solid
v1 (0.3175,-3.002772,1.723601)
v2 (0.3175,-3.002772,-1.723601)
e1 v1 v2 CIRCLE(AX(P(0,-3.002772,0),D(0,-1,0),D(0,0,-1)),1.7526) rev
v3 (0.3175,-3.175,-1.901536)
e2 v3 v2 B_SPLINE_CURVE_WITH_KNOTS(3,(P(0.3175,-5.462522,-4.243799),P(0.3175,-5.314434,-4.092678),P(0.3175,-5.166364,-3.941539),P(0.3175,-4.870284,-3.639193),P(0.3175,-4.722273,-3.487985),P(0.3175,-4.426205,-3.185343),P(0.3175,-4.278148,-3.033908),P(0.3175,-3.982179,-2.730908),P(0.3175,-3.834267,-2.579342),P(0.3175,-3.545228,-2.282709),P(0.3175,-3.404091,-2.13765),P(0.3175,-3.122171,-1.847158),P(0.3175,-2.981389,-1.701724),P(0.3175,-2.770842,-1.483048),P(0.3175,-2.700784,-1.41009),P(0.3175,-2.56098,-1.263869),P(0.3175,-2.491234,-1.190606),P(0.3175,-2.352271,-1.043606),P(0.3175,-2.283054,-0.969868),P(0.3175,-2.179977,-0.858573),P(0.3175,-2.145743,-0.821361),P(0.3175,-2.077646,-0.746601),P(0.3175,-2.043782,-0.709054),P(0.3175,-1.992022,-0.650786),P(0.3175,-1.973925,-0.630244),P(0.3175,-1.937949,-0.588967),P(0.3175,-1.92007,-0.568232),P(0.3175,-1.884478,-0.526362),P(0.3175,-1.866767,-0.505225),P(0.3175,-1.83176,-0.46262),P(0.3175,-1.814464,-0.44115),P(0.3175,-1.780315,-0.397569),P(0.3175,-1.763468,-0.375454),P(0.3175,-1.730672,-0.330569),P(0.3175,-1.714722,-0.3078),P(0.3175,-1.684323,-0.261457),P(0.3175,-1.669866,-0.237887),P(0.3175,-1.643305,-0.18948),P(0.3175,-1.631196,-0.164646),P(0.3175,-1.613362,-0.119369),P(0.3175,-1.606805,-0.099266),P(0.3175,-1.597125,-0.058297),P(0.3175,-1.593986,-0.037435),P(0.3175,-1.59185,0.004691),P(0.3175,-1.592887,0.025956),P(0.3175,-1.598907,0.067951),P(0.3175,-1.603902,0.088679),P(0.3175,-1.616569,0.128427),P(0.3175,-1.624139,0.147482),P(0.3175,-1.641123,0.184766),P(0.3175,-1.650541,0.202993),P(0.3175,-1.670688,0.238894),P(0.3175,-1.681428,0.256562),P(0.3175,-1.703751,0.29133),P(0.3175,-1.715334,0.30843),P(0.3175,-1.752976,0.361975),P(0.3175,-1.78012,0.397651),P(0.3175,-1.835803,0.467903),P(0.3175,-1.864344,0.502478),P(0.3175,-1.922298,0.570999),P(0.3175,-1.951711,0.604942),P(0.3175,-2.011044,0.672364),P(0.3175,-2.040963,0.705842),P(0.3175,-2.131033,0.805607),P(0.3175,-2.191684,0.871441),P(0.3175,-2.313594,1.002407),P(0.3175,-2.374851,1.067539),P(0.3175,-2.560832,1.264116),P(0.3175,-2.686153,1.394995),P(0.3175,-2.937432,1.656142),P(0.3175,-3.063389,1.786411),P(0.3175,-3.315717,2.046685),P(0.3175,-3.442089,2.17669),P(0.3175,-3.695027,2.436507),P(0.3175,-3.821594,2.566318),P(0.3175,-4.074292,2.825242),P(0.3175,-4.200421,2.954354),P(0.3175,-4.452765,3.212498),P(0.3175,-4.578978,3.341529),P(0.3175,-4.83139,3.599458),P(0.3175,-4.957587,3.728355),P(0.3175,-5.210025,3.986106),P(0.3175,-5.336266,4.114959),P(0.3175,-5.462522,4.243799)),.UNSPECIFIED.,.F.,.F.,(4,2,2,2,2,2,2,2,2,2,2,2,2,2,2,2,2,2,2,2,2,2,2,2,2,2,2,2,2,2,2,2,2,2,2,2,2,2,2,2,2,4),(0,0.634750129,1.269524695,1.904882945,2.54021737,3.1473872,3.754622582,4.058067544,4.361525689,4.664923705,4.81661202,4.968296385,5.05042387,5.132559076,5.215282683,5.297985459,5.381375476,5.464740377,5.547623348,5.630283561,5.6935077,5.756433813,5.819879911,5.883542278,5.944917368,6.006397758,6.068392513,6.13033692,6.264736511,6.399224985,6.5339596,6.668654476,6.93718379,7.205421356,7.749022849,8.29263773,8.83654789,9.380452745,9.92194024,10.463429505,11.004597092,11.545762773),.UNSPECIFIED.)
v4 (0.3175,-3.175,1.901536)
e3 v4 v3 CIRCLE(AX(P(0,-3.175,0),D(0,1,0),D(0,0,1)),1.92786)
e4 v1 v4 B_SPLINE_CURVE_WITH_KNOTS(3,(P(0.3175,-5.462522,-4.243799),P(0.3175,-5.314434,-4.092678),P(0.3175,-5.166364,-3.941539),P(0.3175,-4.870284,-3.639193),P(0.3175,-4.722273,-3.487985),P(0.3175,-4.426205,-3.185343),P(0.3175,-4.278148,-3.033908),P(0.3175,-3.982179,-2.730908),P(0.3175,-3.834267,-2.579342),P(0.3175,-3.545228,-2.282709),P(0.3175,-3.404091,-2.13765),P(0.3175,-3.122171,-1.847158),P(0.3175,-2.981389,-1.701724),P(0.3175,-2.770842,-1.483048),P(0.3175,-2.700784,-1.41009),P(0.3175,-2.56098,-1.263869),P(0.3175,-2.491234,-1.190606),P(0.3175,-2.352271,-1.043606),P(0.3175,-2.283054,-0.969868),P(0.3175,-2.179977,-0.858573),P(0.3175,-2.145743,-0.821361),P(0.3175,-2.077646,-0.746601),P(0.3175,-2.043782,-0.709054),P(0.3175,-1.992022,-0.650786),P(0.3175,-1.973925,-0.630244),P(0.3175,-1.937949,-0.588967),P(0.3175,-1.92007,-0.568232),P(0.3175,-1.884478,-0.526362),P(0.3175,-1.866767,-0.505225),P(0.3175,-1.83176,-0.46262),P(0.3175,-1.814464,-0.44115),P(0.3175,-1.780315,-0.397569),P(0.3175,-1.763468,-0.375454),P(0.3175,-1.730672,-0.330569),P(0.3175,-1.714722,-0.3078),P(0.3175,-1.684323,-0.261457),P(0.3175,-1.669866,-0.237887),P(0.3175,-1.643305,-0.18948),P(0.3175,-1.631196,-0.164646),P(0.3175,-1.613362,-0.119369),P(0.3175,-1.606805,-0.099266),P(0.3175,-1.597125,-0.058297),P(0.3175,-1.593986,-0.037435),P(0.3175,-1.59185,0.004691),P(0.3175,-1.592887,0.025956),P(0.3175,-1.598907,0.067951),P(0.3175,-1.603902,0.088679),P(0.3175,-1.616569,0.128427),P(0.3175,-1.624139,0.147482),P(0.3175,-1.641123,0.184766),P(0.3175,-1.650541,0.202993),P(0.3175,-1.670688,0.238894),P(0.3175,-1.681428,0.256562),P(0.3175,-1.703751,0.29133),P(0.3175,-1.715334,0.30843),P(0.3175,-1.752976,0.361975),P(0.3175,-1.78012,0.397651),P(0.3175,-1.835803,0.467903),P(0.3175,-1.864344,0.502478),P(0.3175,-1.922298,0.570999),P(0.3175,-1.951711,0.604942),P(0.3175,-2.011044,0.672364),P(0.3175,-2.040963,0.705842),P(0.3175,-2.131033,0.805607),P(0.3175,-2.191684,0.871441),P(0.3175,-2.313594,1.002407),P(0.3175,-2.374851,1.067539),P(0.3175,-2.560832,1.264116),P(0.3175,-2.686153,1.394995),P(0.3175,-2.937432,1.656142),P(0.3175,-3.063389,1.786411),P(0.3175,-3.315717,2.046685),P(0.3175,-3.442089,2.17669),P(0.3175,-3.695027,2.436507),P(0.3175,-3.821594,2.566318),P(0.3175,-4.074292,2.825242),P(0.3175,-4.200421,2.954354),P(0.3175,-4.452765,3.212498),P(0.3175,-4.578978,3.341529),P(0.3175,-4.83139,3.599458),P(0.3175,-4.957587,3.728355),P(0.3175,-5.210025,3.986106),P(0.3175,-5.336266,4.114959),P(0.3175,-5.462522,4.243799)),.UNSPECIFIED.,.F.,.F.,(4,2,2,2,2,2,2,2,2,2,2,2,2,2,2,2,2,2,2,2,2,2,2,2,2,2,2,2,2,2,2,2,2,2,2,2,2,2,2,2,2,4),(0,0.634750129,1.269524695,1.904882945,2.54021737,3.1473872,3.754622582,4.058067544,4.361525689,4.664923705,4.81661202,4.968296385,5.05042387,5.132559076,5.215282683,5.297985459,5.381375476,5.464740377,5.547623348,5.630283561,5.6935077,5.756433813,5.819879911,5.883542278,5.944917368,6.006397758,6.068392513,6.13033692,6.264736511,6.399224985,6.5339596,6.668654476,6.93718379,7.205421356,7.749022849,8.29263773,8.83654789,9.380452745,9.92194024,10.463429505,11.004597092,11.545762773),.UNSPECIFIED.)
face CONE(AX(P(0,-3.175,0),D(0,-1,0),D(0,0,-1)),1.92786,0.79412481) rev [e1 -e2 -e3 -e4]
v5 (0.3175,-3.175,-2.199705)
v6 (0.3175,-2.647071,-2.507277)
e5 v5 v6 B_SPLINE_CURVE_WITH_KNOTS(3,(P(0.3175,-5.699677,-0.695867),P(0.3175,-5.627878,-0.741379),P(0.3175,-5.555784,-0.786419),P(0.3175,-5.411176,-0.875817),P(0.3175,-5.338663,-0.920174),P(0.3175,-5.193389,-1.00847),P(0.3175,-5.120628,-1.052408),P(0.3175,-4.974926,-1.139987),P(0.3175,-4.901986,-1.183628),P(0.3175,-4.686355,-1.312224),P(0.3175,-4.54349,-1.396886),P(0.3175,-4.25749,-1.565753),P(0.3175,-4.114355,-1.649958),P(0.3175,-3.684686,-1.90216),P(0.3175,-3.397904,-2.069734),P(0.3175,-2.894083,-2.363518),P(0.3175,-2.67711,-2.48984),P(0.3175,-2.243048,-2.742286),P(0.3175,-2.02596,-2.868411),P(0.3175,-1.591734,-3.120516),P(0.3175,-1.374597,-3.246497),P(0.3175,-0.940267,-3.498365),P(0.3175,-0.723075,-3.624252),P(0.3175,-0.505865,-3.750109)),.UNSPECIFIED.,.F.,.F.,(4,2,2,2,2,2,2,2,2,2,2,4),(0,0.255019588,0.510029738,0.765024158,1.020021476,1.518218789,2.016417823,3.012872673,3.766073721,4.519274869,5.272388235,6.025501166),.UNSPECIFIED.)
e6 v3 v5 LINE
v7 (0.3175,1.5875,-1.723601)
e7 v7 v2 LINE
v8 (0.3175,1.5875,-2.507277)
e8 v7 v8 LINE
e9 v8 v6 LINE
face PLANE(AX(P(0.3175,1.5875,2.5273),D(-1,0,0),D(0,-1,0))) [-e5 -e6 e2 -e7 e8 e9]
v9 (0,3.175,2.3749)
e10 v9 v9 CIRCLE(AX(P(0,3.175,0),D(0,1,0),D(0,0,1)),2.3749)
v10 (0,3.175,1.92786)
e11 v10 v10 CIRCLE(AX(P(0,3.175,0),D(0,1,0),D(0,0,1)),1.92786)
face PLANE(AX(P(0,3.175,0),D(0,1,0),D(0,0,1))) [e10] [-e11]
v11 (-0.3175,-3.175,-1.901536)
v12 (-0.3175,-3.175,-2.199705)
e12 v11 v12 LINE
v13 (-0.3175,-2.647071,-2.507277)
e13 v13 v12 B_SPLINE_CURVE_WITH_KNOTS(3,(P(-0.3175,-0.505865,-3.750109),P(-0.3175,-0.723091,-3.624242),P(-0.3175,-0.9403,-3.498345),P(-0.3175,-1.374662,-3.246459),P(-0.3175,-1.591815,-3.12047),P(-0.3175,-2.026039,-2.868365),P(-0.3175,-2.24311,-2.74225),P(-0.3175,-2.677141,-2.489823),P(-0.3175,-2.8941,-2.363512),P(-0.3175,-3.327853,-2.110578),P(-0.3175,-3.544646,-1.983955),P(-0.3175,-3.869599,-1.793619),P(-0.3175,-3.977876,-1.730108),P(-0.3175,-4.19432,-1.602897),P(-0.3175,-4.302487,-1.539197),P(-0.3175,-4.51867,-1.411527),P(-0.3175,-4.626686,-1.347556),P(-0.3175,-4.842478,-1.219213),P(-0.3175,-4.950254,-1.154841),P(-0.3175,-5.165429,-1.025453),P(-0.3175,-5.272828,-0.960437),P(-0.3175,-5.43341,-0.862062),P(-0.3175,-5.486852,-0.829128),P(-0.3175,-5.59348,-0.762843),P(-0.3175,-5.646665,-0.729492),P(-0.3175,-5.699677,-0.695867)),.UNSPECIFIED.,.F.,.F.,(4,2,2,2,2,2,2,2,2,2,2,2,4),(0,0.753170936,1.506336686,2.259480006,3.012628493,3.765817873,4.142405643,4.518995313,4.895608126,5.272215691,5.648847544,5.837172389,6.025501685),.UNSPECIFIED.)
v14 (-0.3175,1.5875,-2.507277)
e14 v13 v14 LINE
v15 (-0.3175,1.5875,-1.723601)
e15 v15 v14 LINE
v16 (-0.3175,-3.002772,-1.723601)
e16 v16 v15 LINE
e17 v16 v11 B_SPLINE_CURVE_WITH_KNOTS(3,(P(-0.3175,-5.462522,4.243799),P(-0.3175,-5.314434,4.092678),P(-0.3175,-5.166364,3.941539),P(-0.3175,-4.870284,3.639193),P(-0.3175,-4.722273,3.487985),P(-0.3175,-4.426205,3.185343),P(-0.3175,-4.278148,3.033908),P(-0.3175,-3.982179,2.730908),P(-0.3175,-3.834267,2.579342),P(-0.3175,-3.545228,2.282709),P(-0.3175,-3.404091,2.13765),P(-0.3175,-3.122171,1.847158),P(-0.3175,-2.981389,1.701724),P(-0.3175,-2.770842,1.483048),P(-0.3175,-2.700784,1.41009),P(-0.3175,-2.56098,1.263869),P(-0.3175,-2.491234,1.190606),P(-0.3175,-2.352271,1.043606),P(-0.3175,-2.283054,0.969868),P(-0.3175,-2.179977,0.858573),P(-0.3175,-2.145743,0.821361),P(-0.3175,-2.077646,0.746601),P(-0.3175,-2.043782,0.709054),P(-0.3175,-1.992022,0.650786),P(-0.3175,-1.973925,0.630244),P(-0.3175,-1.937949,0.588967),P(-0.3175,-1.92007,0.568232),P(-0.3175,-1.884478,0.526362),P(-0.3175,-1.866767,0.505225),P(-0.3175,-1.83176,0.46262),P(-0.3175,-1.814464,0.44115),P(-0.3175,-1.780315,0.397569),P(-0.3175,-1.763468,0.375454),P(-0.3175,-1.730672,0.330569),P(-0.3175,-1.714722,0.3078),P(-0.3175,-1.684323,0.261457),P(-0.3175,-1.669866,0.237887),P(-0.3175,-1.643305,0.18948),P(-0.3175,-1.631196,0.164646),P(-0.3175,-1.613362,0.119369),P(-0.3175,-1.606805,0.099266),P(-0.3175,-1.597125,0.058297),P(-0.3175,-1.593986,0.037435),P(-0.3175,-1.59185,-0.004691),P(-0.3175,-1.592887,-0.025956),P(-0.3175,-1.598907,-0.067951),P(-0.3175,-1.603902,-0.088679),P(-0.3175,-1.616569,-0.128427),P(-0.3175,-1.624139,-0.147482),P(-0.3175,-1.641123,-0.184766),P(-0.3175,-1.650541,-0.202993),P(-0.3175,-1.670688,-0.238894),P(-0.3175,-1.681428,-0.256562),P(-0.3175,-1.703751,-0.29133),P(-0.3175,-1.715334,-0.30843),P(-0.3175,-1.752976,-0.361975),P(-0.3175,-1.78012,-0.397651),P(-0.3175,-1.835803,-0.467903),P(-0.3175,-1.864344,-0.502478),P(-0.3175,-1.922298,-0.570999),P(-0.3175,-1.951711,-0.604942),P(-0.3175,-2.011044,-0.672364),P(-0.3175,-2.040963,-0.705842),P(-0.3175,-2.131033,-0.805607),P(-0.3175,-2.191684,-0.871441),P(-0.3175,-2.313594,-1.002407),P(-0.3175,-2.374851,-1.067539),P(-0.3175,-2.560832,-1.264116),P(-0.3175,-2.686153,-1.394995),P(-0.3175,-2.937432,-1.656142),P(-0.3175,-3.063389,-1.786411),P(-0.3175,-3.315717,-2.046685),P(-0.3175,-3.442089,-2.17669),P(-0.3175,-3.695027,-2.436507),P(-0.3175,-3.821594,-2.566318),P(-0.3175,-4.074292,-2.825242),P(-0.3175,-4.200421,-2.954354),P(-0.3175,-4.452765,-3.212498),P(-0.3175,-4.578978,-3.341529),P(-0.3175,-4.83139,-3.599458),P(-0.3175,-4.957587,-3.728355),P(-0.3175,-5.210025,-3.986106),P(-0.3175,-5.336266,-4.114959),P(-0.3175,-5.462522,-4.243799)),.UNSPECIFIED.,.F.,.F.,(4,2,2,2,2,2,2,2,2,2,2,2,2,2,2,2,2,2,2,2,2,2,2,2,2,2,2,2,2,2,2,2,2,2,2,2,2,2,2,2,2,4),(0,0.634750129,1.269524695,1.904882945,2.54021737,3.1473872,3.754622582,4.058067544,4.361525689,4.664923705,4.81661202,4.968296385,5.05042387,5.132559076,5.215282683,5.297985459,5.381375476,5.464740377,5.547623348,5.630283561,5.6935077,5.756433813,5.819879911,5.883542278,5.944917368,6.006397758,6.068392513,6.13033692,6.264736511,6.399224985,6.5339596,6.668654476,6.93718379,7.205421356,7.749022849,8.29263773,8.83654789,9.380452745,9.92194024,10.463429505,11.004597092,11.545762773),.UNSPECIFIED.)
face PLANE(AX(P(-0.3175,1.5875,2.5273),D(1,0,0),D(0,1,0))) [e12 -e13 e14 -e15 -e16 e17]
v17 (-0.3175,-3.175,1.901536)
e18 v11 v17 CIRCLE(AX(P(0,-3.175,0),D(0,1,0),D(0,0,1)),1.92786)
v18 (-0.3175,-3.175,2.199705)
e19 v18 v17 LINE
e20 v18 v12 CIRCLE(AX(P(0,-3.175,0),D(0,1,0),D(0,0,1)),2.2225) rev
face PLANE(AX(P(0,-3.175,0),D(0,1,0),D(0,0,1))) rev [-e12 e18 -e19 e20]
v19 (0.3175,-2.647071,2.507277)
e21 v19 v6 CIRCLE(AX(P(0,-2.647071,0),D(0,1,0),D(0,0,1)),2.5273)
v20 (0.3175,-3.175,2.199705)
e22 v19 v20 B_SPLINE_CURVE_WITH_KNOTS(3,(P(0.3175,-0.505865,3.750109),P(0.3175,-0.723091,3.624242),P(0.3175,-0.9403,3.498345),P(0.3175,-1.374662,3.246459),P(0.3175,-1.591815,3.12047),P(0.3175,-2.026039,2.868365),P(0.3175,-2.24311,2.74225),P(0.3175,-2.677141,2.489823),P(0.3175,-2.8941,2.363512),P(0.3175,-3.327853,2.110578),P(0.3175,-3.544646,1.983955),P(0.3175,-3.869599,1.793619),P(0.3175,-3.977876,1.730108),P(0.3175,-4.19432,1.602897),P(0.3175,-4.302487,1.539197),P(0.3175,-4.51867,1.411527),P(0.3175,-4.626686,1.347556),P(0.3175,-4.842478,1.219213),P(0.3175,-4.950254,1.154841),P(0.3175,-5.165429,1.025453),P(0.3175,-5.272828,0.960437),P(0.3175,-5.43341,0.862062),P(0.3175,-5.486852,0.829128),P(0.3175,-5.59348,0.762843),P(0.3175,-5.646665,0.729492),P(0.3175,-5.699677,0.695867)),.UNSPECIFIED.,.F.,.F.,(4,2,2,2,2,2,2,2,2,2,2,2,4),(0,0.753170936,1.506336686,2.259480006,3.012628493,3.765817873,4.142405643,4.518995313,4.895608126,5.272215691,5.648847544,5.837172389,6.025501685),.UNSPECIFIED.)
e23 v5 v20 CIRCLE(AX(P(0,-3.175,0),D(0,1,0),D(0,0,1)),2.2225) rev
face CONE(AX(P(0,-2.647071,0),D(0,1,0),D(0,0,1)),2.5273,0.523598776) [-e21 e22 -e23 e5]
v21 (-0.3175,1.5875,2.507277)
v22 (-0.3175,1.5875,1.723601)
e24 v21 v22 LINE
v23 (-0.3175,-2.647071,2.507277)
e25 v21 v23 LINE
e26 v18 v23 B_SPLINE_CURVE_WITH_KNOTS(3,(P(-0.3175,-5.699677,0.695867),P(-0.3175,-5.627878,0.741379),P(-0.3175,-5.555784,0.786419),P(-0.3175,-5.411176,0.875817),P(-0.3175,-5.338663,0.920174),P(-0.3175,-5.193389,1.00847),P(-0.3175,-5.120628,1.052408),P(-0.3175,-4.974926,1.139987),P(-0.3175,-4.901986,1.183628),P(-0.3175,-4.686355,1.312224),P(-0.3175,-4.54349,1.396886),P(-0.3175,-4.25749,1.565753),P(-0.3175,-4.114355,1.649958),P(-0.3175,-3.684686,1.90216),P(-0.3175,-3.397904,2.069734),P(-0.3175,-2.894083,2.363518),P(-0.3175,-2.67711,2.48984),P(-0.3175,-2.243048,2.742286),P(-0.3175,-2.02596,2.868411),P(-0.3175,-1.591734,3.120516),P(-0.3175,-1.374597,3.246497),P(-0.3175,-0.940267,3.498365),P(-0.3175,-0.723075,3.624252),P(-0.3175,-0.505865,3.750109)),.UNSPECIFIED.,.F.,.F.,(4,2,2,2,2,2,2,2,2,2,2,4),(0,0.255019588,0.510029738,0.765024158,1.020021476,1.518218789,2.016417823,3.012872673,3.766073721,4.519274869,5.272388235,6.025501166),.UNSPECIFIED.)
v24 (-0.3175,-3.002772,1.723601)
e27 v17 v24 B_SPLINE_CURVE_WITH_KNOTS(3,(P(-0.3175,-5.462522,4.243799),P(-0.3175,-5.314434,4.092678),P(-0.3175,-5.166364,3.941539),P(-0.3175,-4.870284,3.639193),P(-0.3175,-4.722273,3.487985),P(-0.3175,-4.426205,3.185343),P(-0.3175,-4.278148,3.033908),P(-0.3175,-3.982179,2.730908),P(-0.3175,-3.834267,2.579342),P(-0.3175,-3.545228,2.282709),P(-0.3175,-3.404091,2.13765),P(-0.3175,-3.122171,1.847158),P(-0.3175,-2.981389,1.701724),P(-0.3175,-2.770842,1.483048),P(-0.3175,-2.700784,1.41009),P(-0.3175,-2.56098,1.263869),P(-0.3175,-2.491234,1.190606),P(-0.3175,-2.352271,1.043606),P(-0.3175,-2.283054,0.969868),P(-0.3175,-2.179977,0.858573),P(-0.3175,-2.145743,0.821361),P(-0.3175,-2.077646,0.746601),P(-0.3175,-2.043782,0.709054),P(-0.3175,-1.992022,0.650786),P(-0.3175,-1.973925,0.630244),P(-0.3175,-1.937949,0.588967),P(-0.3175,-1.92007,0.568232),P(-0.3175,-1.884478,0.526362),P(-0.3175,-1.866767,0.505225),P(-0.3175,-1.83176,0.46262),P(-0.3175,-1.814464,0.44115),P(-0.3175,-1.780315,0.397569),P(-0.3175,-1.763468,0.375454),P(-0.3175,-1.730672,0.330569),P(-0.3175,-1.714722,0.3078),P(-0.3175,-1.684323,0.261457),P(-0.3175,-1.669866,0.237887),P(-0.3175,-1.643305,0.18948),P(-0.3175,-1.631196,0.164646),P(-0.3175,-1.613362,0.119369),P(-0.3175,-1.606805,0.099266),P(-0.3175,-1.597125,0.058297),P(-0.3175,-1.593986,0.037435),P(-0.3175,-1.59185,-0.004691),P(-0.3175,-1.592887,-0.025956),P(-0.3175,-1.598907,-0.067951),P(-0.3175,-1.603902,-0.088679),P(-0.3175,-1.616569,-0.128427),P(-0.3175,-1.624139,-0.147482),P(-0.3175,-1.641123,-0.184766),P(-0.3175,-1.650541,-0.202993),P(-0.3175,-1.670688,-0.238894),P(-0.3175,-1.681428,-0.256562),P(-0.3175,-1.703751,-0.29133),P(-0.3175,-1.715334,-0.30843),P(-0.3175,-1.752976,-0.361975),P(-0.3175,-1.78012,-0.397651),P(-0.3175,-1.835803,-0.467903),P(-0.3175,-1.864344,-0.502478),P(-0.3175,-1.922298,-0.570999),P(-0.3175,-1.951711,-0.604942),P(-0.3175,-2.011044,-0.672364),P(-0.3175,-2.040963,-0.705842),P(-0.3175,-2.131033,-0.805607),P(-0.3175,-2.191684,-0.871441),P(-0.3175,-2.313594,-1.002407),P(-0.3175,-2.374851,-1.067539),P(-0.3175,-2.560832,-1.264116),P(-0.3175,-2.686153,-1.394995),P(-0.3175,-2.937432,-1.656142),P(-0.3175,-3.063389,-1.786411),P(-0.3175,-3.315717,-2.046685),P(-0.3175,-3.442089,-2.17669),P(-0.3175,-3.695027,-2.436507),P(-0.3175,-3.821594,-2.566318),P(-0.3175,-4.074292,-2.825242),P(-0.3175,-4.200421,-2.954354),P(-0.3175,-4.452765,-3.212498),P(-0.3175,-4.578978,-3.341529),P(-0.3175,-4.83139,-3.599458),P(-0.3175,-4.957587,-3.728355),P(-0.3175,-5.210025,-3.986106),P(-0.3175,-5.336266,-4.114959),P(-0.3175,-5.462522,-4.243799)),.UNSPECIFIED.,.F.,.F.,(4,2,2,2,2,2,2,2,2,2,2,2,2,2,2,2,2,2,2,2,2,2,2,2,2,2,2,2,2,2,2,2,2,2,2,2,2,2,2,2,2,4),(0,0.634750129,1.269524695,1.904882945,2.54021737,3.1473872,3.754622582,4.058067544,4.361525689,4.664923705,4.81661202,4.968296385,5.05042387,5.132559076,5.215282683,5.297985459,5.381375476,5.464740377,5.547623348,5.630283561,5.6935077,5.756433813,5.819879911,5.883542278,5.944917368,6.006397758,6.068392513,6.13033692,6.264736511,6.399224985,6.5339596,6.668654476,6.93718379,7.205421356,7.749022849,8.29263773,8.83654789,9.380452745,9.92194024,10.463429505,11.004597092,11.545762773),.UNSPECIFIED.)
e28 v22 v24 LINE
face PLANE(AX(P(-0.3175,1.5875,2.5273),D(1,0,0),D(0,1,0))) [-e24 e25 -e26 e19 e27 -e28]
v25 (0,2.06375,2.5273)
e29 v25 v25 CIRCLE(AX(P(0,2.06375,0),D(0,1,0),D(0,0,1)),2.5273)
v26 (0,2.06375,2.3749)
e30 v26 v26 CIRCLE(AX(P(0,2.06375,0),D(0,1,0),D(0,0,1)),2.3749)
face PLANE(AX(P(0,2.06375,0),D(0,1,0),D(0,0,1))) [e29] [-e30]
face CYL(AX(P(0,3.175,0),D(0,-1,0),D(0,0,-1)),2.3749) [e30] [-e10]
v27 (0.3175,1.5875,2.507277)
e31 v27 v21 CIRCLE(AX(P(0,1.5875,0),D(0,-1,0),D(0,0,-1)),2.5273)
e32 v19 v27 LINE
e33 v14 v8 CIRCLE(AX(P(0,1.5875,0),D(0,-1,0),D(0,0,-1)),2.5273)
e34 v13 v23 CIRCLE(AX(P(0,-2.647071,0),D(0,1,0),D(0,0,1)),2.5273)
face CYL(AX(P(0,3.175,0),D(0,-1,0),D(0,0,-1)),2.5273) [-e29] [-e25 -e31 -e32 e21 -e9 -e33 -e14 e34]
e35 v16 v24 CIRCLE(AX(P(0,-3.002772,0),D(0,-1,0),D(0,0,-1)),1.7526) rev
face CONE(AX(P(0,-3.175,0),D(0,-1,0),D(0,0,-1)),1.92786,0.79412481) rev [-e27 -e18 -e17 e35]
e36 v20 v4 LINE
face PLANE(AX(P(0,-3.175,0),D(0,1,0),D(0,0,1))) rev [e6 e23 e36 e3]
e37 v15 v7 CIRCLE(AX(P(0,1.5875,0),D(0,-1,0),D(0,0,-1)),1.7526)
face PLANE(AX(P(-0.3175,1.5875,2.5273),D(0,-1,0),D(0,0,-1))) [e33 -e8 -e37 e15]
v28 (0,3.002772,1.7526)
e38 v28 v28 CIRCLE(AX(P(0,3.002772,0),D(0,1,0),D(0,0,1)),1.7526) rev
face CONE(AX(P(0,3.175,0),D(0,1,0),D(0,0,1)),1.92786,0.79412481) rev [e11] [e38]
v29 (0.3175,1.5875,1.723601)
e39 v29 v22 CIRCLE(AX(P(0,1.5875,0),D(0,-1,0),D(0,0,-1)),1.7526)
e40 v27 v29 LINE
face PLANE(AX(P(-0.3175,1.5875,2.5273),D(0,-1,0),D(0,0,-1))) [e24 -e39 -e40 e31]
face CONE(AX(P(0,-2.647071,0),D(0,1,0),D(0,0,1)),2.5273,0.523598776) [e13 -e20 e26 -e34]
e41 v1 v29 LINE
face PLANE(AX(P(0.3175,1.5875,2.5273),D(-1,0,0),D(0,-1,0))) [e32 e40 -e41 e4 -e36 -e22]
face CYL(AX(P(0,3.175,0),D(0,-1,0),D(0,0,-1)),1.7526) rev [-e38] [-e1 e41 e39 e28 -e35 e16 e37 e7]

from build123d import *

# Parameters (mm, degrees)
BOSS_EXTRUDE1_DEPTH      = 3.175
BOSS_EXTRUDE1_DEPTH_BACK = 3.175
SKETCH11_R               = 2.5273
SKETCH11_R_2             = 1.7526
CUT_EXTRUDE1_START       = 2.06375
SKETCH12_R               = 2.5273
SKETCH12_R_2             = 2.3749
CUT_EXTRUDE1_DEPTH       = 1.11125
CHAMFER2_SIZE            = 0.3048
CHAMFER2_SIZE2           = 0.527929086
EXTRUDE4_DEPTH           = 5.780702415
EXTRUDE4_DEPTH_BACK      = 5.780702415
SKETCH8_W                = 0.635
SKETCH8_H                = 4.7625


# Read off the part's stored shape, not the designer's step: Cut-Extrude3, Cut-Extrude10
with BuildPart() as part:
    # Sketch11 → Boss-Extrude1 (new, two sides: drawn at the far end of the back side and taken through both)
    with BuildSketch(Plane(origin=(0, 0, 0), x_dir=(1, 0, 0), z_dir=(0, 1, 0)).offset(-BOSS_EXTRUDE1_DEPTH_BACK)):
        with Locations(Location((0, 0, 0), (0, 0, 90))):
            Circle(SKETCH11_R)
        with Locations(Location((0, 0, 0), (0, 0, 90))):
            Circle(SKETCH11_R_2, mode=Mode.SUBTRACT)
    extrude(amount=BOSS_EXTRUDE1_DEPTH + BOSS_EXTRUDE1_DEPTH_BACK)

    # Sketch12 → Cut-Extrude1 (cut)
    with BuildSketch(Plane(origin=(0, 0, 0), x_dir=(1, 0, 0), z_dir=(0, 1, 0)).offset(CUT_EXTRUDE1_START)):
        with Locations(Location((0, 0, 0), (0, 0, 90))):
            Circle(SKETCH12_R)
        with Locations(Location((0, 0, 0), (0, 0, 270))):
            Circle(SKETCH12_R_2, mode=Mode.SUBTRACT)
    extrude(amount=CUT_EXTRUDE1_DEPTH, mode=Mode.SUBTRACT)

    # Cut-Extrude3 outline → Cut-Extrude3 (revolve, cut)
    with BuildSketch(Plane.XY):
        Polygon((1.7526, 3.175), (1.7526, 3.002772478), (1.92786, 3.175), align=None)
    revolve(axis=Axis((0, 0, 0), (0, 1, 0)), mode=Mode.SUBTRACT)

    # Cut-Extrude10 outline → Cut-Extrude10 (revolve, cut)
    with BuildSketch(Plane.XY):
        Polygon((1.92786, -3.175), (1.7526, -3.002772478), (1.7526, -3.175), align=None)
    revolve(axis=Axis((0, 0, 0), (0, 1, 0)), mode=Mode.SUBTRACT)

    # Chamfer2
    chamfer2_edges = [part.edges().sort_by_distance(p)[0] for p in [
        (0, -3.175, 2.5273),
    ]]
    chamfer2_side = [part.faces().sort_by_distance(p)[0] for p in [
        (0, -3.175, 2.455817161),
    ]]
    chamfer(chamfer2_edges, length=CHAMFER2_SIZE, length2=CHAMFER2_SIZE2, reference=chamfer2_side[0])

    # Sketch8 → Extrude4 (cut, two sides: drawn at the far end of the back side and taken through both)
    with BuildSketch(Plane.XY.offset(-EXTRUDE4_DEPTH_BACK)):
        with Locations((0, -0.79375)):
            Rectangle(SKETCH8_W, SKETCH8_H)
    extrude(amount=EXTRUDE4_DEPTH + EXTRUDE4_DEPTH_BACK, mode=Mode.SUBTRACT)


solid = part.part
